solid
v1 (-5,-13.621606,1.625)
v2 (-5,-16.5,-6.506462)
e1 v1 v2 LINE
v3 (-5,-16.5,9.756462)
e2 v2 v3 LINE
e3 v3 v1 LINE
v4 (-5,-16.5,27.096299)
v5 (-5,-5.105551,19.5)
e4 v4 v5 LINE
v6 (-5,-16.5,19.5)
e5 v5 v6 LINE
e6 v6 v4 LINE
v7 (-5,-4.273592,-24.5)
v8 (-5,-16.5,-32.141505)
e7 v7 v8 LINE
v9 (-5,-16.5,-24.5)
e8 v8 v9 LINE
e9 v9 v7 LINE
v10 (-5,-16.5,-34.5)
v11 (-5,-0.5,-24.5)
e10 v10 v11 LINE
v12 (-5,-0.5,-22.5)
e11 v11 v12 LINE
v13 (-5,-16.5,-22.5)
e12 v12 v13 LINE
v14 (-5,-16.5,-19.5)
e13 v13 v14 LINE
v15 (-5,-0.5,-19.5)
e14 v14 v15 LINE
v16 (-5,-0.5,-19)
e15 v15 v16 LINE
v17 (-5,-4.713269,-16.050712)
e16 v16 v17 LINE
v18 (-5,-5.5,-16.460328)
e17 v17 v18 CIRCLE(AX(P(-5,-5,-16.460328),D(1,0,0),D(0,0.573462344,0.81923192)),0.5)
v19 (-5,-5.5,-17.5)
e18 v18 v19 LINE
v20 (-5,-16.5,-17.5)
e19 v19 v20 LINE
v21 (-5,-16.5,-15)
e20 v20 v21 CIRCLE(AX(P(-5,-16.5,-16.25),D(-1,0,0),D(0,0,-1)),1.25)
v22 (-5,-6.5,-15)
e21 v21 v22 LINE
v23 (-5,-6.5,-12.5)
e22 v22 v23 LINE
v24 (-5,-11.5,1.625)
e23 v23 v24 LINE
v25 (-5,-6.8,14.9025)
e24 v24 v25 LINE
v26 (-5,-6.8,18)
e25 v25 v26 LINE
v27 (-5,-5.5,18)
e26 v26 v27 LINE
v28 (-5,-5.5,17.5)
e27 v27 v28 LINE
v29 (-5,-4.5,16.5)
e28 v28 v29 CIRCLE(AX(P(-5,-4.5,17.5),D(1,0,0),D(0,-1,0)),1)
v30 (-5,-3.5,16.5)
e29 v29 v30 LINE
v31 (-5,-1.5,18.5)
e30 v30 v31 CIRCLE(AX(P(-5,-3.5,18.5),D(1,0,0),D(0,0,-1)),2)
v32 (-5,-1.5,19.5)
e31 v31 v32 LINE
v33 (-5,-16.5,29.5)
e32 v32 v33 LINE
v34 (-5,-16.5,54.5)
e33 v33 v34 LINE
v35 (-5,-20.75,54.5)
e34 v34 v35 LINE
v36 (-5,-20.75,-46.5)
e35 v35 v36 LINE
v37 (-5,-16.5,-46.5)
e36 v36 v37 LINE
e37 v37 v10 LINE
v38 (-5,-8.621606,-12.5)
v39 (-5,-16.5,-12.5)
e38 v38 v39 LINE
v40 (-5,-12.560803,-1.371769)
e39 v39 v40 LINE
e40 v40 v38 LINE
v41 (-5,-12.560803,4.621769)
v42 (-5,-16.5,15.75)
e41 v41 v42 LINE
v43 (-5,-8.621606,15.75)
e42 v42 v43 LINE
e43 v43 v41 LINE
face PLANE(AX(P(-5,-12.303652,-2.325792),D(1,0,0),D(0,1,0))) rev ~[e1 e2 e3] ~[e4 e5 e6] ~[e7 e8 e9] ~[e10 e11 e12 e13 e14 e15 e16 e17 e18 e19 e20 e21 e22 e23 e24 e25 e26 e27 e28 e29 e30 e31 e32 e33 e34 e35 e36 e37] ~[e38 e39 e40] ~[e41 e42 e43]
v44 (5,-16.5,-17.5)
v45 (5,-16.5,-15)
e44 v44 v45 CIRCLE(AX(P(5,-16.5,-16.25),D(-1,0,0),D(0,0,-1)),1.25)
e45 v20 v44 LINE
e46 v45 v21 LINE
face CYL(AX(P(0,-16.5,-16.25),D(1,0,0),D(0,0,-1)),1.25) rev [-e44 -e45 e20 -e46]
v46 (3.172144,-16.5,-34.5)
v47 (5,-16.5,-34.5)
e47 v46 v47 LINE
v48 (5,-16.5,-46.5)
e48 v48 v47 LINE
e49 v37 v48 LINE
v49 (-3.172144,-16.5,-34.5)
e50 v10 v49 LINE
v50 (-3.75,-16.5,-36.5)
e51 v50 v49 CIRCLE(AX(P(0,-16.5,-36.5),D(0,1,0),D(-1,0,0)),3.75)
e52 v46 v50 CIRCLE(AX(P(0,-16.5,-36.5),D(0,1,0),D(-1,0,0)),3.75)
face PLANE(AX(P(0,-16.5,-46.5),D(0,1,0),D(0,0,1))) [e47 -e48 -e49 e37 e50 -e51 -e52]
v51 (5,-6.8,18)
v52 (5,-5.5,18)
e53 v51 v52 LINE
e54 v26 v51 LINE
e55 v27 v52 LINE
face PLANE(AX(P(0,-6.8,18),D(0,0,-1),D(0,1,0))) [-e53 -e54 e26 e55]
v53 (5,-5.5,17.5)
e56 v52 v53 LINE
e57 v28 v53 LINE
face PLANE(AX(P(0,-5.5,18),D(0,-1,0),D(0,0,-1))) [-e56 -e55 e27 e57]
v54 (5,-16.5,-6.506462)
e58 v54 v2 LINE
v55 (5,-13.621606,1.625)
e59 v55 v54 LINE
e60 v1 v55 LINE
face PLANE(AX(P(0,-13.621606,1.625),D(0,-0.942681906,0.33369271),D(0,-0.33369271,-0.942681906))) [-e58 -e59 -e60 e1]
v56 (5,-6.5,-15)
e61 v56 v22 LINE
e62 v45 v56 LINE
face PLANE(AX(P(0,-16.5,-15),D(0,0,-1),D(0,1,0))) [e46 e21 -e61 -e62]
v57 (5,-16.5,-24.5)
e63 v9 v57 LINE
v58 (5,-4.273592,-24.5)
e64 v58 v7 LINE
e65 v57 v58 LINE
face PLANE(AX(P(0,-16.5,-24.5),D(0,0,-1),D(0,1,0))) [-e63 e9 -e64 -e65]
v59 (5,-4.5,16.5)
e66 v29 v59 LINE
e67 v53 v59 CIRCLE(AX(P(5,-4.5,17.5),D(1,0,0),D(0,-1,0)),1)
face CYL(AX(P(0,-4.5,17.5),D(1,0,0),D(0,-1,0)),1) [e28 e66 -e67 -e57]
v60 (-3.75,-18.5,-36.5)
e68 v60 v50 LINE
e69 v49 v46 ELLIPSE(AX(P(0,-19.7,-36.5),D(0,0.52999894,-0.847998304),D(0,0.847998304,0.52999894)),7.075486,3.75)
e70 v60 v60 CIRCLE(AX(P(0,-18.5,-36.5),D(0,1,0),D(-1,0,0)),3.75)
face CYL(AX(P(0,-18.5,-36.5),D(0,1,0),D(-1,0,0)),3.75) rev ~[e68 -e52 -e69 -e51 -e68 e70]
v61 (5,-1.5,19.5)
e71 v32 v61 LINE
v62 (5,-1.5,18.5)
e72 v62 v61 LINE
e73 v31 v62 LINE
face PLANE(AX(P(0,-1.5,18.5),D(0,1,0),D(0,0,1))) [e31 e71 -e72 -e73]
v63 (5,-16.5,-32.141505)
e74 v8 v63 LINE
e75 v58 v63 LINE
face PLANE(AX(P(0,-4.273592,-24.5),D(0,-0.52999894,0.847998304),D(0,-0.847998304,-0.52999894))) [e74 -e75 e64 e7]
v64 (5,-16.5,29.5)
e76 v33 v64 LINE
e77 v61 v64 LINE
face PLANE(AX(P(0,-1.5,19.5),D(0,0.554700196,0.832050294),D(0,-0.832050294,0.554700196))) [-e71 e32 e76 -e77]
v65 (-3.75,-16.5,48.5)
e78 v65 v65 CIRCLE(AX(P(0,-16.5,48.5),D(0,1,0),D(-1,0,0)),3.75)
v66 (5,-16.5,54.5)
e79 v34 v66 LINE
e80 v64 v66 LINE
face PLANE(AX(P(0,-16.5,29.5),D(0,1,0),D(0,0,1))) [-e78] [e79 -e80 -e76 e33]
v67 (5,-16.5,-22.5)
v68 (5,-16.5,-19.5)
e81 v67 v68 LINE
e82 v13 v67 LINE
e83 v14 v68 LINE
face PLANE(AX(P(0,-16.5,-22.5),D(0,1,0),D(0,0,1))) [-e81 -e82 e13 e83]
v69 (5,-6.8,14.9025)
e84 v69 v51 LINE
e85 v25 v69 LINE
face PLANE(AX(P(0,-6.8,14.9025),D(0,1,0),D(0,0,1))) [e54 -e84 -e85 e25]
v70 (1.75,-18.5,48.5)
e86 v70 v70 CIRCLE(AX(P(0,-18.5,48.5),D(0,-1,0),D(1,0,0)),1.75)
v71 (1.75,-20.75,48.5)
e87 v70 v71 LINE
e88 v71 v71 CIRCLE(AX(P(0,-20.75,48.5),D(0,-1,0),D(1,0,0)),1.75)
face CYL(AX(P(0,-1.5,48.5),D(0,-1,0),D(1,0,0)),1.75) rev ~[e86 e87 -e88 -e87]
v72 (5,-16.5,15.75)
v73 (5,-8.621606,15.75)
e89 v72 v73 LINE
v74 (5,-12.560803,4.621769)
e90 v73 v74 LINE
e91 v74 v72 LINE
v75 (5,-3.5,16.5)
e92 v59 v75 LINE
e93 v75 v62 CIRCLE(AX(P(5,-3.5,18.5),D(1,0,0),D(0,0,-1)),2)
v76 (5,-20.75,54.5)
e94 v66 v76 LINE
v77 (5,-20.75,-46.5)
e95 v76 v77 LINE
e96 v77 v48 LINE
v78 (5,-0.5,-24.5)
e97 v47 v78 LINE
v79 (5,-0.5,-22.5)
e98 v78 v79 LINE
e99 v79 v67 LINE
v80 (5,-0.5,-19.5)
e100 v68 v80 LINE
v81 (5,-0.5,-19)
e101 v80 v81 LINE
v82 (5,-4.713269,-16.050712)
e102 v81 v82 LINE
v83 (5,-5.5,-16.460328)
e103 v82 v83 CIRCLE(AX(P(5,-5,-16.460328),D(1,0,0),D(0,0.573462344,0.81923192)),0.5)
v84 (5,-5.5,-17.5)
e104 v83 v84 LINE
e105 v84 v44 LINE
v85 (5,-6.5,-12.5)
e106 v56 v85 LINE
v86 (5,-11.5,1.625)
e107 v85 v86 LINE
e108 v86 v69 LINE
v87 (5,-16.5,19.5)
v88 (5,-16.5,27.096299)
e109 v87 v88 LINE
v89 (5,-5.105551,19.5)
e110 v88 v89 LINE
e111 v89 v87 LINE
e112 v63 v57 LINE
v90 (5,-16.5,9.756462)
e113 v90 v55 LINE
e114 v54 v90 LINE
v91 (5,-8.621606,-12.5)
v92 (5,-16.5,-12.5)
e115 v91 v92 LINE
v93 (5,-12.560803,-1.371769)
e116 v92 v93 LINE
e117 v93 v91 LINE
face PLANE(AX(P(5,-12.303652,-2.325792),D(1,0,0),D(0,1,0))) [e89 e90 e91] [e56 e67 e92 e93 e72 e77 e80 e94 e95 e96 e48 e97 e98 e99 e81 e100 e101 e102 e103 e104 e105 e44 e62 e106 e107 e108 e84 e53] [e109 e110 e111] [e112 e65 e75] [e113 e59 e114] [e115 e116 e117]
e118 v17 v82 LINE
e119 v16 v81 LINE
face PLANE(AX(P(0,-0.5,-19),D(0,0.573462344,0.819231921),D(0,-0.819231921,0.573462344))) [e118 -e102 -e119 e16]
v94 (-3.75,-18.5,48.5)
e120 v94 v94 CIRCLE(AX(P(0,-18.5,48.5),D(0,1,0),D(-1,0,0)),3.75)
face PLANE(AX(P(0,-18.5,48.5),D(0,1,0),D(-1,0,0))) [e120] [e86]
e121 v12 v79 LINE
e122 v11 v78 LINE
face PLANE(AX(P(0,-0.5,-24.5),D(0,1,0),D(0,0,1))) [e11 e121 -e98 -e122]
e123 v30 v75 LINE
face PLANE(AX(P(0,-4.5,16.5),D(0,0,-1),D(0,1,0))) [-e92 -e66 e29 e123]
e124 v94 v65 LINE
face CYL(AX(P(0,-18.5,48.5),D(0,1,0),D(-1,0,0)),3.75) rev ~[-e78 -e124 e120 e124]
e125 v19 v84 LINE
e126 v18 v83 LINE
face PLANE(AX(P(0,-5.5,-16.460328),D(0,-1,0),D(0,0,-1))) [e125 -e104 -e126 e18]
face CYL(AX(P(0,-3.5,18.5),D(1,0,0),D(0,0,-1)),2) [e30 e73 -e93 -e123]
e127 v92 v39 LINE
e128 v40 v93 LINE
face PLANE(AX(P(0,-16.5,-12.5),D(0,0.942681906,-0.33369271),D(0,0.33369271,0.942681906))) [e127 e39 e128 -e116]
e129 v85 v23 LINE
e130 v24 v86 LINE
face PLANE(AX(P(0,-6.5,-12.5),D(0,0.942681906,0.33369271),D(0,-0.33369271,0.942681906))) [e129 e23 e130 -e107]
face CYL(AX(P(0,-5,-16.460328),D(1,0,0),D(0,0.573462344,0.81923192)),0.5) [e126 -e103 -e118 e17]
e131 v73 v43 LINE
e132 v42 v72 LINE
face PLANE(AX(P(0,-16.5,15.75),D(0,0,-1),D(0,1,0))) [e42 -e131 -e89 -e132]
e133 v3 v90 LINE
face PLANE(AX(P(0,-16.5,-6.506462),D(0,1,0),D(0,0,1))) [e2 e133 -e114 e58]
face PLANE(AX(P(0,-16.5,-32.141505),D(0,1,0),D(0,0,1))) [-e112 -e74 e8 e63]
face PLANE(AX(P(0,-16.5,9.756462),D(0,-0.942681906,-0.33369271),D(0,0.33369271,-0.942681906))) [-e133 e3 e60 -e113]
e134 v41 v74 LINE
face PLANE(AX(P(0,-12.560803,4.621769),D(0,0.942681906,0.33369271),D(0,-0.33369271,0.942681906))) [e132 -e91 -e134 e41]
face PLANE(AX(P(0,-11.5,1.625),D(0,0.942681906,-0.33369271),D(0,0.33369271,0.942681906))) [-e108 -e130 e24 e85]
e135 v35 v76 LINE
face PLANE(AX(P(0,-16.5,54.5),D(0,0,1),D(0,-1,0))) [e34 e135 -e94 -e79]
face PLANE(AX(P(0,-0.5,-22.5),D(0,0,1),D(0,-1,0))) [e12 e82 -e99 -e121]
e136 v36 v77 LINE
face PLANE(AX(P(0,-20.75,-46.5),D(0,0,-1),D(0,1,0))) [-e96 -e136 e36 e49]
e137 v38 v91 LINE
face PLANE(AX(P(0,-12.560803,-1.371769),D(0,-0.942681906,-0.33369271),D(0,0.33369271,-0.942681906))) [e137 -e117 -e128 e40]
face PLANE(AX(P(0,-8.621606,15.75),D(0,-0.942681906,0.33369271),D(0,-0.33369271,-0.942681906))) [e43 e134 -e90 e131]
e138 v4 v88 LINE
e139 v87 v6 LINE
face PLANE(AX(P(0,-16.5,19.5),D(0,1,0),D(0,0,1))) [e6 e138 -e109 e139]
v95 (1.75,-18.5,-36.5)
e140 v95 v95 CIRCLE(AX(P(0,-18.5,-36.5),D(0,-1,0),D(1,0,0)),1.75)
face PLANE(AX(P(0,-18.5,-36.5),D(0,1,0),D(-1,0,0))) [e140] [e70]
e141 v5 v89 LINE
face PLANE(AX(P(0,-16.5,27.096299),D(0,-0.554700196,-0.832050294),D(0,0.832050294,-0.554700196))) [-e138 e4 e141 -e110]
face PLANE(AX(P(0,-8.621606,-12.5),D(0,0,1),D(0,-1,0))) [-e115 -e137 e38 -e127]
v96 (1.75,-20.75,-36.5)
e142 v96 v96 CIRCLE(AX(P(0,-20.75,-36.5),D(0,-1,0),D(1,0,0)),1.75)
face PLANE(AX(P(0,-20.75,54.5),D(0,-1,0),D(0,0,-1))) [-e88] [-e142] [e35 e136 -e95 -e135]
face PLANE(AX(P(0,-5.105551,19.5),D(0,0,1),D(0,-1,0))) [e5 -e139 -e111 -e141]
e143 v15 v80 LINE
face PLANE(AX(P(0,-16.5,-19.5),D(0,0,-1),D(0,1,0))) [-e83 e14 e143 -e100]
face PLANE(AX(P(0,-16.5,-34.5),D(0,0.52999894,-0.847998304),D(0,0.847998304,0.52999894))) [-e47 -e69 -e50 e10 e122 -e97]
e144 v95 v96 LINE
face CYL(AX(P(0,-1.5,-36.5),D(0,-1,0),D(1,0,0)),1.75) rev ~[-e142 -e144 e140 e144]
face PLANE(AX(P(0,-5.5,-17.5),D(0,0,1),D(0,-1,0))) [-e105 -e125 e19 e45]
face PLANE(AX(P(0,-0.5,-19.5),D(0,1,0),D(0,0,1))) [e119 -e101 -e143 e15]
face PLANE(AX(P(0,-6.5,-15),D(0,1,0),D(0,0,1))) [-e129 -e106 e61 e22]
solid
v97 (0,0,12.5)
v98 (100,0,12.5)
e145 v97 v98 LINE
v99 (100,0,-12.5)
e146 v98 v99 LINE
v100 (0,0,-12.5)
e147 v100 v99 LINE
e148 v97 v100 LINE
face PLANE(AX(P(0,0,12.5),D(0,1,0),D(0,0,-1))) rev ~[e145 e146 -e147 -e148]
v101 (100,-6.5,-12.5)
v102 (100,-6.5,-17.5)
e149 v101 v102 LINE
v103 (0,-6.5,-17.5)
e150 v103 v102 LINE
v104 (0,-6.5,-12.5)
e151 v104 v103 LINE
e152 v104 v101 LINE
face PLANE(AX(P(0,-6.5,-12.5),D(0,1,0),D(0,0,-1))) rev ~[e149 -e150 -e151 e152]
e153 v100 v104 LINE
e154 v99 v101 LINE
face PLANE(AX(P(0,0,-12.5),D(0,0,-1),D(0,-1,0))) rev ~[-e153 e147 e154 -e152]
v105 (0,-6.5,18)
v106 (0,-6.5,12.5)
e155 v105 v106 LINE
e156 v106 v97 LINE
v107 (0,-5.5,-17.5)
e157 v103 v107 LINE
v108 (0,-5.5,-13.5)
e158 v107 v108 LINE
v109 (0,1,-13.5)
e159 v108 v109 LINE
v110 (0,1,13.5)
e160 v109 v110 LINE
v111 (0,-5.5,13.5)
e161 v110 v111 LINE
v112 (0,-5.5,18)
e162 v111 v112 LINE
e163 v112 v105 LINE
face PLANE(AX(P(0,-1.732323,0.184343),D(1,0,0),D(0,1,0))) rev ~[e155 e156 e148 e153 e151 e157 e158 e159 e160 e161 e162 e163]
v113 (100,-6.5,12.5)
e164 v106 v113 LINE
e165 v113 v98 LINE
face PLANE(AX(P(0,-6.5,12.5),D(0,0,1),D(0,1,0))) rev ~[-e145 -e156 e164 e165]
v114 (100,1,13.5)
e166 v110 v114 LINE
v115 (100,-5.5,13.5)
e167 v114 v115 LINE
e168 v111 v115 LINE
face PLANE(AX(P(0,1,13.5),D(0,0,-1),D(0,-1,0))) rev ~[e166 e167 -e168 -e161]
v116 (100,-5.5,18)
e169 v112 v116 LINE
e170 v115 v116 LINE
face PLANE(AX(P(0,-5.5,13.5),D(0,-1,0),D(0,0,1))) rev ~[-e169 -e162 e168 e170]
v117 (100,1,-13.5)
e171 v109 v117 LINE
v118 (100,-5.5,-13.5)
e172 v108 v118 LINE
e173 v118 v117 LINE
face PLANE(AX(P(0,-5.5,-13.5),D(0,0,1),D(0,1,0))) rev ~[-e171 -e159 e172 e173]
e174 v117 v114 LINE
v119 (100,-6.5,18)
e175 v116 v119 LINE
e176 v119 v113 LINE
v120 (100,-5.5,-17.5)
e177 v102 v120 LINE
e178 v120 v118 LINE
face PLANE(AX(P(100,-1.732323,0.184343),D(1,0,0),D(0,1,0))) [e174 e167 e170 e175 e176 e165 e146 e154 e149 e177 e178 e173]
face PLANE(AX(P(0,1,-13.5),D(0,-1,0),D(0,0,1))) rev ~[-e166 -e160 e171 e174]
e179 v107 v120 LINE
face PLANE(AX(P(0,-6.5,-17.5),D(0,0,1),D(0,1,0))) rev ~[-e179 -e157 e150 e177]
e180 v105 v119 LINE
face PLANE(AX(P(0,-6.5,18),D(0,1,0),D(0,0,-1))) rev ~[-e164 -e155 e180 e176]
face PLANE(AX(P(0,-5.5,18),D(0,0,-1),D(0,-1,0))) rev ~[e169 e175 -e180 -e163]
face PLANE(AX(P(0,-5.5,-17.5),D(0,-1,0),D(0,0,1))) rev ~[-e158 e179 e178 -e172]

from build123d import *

# Parameters (mm, degrees)
F1_DEPTH       = 100
F2_W           = 4.25
F2_H           = 12
F3_DEPTH       = 5
F5_D           = 3.5
F5_CBORE_D     = 7.5
F5_CBORE_DEPTH = 17


# Not quite as in the source:
# - a feature names something its author has since deleted; it is built from what else it names


with BuildPart() as f1:
    # F0 (on Right) → F1 (new body)
    with BuildSketch(Plane.YZ):
        Polygon((-5.5, 18), (-6.5, 18), (-6.5, 12.5), (0, 12.5), (0, -12.5), (-6.5, -12.5), (-6.5, -17.5), (-5.5, -17.5), (-5.5, -13.5), (1, -13.5), (1, 13.5), (-5.5, 13.5), align=None)
    extrude(amount=F1_DEPTH)


with BuildPart() as f3:
    # F2 (on Right) → F3 (new body, symmetric)
    with BuildSketch(Plane.YZ):
        with BuildLine():
            ThreePointArc((-3.5, 16.5), (-2.0857864376, 17.0857864376), (-1.5, 18.5))
            Line((-1.5, 18.5), (-1.5, 19.5))
            Line((-1.5, 19.5), (-5.1055512755, 19.5))
            Line((-5.1055512755, 19.5), (-16.5, 19.5))
            Line((-16.5, 19.5), (-20.75, 19.5))
            Line((-20.75, 19.5), (-20.75, -19.5))
            Line((-20.75, -19.5), (-16.5, -19.5))
            Line((-16.5, -19.5), (-0.5, -19.5))
            Line((-0.5, -19.5), (-0.5, -19))
            Line((-0.5, -19), (-4.7132688278, -16.0507118205))
            ThreePointArc((-4.7132688278, -16.0507118205), (-5.2309051904, -16.0168384426), (-5.5, -16.4603277808))
            Line((-5.5, -16.4603277808), (-5.5, -17.5))
            Line((-5.5, -17.5), (-16.5, -17.5))
            ThreePointArc((-16.5, -17.5), (-17.75, -16.25), (-16.5, -15))
            Line((-16.5, -15), (-6.5, -15))
            Line((-6.5, -15), (-6.5, -12.5))
            Line((-6.5, -12.5), (-11.5, 1.625))
            Line((-11.5, 1.625), (-6.8, 14.9025))
            Line((-6.8, 14.9025), (-6.8, 18))
            Line((-6.8, 18), (-6.5, 18))
            Line((-6.5, 18), (-5.5, 18))
            Line((-5.5, 18), (-5.5, 17.5))
            ThreePointArc((-5.5, 17.5), (-5.2071067812, 16.7928932188), (-4.5, 16.5))
            Line((-4.5, 16.5), (-3.5, 16.5))
        make_face()
        Polygon((-16.5, -12.5), (-12.560803219, -1.3717690935), (-8.6216064379, -12.5), align=None, mode=Mode.SUBTRACT)
        Polygon((-12.560803219, 4.6217690935), (-11.5, 1.625), (-12.560803219, -1.3717690935), (-12.6095014243, -1.2341966635), (-13.6216064379, 1.625), (-16.5, -6.5064618129), (-16.5, 9.7564618129), (-16.5, 15.75), (-8.6216064379, 15.75), align=None, mode=Mode.SUBTRACT)
        Polygon((-16.5, -19.5), (-20.75, -19.5), (-20.75, -34.5), (-16.5, -34.5), (-0.5, -24.5), (-0.5, -22.5), (-16.5, -22.5), align=None)
        Polygon((-16.5, -32.141504717), (-16.5, -24.5), (-4.2735924528, -24.5), align=None, mode=Mode.SUBTRACT)
        Polygon((-16.5, 27.0962991497), (-16.5, 29.5), (-16.5, 54.5), (-20.75, 54.5), (-20.75, 19.5), (-16.5, 19.5), align=None)
        with Locations((-18.625, -40.5)):
            Rectangle(F2_W, F2_H)
        Polygon((-5.1055512755, 19.5), (-1.5, 19.5), (-16.5, 29.5), (-16.5, 27.0962991497), align=None)
        Polygon((-12.560803219, -1.3717690935), (-11.5, 1.625), (-12.560803219, 4.6217690935), (-16.5, 15.75), (-16.5, 9.7564618129), (-13.6216064379, 1.625), (-12.6095014243, -1.2341966635), align=None)
    extrude(amount=F3_DEPTH, both=True)

    # F5 (through all)
    with Locations(Plane(origin=(0, -1.5, 0), x_dir=(-1, 0, 0), z_dir=(0, 1, 0))):
        with Locations((0, 48.5), (0, -36.5)):
            CounterBoreHole(F5_D / 2, F5_CBORE_D / 2, F5_CBORE_DEPTH)


solid = Compound([f1.part, f3.part])
